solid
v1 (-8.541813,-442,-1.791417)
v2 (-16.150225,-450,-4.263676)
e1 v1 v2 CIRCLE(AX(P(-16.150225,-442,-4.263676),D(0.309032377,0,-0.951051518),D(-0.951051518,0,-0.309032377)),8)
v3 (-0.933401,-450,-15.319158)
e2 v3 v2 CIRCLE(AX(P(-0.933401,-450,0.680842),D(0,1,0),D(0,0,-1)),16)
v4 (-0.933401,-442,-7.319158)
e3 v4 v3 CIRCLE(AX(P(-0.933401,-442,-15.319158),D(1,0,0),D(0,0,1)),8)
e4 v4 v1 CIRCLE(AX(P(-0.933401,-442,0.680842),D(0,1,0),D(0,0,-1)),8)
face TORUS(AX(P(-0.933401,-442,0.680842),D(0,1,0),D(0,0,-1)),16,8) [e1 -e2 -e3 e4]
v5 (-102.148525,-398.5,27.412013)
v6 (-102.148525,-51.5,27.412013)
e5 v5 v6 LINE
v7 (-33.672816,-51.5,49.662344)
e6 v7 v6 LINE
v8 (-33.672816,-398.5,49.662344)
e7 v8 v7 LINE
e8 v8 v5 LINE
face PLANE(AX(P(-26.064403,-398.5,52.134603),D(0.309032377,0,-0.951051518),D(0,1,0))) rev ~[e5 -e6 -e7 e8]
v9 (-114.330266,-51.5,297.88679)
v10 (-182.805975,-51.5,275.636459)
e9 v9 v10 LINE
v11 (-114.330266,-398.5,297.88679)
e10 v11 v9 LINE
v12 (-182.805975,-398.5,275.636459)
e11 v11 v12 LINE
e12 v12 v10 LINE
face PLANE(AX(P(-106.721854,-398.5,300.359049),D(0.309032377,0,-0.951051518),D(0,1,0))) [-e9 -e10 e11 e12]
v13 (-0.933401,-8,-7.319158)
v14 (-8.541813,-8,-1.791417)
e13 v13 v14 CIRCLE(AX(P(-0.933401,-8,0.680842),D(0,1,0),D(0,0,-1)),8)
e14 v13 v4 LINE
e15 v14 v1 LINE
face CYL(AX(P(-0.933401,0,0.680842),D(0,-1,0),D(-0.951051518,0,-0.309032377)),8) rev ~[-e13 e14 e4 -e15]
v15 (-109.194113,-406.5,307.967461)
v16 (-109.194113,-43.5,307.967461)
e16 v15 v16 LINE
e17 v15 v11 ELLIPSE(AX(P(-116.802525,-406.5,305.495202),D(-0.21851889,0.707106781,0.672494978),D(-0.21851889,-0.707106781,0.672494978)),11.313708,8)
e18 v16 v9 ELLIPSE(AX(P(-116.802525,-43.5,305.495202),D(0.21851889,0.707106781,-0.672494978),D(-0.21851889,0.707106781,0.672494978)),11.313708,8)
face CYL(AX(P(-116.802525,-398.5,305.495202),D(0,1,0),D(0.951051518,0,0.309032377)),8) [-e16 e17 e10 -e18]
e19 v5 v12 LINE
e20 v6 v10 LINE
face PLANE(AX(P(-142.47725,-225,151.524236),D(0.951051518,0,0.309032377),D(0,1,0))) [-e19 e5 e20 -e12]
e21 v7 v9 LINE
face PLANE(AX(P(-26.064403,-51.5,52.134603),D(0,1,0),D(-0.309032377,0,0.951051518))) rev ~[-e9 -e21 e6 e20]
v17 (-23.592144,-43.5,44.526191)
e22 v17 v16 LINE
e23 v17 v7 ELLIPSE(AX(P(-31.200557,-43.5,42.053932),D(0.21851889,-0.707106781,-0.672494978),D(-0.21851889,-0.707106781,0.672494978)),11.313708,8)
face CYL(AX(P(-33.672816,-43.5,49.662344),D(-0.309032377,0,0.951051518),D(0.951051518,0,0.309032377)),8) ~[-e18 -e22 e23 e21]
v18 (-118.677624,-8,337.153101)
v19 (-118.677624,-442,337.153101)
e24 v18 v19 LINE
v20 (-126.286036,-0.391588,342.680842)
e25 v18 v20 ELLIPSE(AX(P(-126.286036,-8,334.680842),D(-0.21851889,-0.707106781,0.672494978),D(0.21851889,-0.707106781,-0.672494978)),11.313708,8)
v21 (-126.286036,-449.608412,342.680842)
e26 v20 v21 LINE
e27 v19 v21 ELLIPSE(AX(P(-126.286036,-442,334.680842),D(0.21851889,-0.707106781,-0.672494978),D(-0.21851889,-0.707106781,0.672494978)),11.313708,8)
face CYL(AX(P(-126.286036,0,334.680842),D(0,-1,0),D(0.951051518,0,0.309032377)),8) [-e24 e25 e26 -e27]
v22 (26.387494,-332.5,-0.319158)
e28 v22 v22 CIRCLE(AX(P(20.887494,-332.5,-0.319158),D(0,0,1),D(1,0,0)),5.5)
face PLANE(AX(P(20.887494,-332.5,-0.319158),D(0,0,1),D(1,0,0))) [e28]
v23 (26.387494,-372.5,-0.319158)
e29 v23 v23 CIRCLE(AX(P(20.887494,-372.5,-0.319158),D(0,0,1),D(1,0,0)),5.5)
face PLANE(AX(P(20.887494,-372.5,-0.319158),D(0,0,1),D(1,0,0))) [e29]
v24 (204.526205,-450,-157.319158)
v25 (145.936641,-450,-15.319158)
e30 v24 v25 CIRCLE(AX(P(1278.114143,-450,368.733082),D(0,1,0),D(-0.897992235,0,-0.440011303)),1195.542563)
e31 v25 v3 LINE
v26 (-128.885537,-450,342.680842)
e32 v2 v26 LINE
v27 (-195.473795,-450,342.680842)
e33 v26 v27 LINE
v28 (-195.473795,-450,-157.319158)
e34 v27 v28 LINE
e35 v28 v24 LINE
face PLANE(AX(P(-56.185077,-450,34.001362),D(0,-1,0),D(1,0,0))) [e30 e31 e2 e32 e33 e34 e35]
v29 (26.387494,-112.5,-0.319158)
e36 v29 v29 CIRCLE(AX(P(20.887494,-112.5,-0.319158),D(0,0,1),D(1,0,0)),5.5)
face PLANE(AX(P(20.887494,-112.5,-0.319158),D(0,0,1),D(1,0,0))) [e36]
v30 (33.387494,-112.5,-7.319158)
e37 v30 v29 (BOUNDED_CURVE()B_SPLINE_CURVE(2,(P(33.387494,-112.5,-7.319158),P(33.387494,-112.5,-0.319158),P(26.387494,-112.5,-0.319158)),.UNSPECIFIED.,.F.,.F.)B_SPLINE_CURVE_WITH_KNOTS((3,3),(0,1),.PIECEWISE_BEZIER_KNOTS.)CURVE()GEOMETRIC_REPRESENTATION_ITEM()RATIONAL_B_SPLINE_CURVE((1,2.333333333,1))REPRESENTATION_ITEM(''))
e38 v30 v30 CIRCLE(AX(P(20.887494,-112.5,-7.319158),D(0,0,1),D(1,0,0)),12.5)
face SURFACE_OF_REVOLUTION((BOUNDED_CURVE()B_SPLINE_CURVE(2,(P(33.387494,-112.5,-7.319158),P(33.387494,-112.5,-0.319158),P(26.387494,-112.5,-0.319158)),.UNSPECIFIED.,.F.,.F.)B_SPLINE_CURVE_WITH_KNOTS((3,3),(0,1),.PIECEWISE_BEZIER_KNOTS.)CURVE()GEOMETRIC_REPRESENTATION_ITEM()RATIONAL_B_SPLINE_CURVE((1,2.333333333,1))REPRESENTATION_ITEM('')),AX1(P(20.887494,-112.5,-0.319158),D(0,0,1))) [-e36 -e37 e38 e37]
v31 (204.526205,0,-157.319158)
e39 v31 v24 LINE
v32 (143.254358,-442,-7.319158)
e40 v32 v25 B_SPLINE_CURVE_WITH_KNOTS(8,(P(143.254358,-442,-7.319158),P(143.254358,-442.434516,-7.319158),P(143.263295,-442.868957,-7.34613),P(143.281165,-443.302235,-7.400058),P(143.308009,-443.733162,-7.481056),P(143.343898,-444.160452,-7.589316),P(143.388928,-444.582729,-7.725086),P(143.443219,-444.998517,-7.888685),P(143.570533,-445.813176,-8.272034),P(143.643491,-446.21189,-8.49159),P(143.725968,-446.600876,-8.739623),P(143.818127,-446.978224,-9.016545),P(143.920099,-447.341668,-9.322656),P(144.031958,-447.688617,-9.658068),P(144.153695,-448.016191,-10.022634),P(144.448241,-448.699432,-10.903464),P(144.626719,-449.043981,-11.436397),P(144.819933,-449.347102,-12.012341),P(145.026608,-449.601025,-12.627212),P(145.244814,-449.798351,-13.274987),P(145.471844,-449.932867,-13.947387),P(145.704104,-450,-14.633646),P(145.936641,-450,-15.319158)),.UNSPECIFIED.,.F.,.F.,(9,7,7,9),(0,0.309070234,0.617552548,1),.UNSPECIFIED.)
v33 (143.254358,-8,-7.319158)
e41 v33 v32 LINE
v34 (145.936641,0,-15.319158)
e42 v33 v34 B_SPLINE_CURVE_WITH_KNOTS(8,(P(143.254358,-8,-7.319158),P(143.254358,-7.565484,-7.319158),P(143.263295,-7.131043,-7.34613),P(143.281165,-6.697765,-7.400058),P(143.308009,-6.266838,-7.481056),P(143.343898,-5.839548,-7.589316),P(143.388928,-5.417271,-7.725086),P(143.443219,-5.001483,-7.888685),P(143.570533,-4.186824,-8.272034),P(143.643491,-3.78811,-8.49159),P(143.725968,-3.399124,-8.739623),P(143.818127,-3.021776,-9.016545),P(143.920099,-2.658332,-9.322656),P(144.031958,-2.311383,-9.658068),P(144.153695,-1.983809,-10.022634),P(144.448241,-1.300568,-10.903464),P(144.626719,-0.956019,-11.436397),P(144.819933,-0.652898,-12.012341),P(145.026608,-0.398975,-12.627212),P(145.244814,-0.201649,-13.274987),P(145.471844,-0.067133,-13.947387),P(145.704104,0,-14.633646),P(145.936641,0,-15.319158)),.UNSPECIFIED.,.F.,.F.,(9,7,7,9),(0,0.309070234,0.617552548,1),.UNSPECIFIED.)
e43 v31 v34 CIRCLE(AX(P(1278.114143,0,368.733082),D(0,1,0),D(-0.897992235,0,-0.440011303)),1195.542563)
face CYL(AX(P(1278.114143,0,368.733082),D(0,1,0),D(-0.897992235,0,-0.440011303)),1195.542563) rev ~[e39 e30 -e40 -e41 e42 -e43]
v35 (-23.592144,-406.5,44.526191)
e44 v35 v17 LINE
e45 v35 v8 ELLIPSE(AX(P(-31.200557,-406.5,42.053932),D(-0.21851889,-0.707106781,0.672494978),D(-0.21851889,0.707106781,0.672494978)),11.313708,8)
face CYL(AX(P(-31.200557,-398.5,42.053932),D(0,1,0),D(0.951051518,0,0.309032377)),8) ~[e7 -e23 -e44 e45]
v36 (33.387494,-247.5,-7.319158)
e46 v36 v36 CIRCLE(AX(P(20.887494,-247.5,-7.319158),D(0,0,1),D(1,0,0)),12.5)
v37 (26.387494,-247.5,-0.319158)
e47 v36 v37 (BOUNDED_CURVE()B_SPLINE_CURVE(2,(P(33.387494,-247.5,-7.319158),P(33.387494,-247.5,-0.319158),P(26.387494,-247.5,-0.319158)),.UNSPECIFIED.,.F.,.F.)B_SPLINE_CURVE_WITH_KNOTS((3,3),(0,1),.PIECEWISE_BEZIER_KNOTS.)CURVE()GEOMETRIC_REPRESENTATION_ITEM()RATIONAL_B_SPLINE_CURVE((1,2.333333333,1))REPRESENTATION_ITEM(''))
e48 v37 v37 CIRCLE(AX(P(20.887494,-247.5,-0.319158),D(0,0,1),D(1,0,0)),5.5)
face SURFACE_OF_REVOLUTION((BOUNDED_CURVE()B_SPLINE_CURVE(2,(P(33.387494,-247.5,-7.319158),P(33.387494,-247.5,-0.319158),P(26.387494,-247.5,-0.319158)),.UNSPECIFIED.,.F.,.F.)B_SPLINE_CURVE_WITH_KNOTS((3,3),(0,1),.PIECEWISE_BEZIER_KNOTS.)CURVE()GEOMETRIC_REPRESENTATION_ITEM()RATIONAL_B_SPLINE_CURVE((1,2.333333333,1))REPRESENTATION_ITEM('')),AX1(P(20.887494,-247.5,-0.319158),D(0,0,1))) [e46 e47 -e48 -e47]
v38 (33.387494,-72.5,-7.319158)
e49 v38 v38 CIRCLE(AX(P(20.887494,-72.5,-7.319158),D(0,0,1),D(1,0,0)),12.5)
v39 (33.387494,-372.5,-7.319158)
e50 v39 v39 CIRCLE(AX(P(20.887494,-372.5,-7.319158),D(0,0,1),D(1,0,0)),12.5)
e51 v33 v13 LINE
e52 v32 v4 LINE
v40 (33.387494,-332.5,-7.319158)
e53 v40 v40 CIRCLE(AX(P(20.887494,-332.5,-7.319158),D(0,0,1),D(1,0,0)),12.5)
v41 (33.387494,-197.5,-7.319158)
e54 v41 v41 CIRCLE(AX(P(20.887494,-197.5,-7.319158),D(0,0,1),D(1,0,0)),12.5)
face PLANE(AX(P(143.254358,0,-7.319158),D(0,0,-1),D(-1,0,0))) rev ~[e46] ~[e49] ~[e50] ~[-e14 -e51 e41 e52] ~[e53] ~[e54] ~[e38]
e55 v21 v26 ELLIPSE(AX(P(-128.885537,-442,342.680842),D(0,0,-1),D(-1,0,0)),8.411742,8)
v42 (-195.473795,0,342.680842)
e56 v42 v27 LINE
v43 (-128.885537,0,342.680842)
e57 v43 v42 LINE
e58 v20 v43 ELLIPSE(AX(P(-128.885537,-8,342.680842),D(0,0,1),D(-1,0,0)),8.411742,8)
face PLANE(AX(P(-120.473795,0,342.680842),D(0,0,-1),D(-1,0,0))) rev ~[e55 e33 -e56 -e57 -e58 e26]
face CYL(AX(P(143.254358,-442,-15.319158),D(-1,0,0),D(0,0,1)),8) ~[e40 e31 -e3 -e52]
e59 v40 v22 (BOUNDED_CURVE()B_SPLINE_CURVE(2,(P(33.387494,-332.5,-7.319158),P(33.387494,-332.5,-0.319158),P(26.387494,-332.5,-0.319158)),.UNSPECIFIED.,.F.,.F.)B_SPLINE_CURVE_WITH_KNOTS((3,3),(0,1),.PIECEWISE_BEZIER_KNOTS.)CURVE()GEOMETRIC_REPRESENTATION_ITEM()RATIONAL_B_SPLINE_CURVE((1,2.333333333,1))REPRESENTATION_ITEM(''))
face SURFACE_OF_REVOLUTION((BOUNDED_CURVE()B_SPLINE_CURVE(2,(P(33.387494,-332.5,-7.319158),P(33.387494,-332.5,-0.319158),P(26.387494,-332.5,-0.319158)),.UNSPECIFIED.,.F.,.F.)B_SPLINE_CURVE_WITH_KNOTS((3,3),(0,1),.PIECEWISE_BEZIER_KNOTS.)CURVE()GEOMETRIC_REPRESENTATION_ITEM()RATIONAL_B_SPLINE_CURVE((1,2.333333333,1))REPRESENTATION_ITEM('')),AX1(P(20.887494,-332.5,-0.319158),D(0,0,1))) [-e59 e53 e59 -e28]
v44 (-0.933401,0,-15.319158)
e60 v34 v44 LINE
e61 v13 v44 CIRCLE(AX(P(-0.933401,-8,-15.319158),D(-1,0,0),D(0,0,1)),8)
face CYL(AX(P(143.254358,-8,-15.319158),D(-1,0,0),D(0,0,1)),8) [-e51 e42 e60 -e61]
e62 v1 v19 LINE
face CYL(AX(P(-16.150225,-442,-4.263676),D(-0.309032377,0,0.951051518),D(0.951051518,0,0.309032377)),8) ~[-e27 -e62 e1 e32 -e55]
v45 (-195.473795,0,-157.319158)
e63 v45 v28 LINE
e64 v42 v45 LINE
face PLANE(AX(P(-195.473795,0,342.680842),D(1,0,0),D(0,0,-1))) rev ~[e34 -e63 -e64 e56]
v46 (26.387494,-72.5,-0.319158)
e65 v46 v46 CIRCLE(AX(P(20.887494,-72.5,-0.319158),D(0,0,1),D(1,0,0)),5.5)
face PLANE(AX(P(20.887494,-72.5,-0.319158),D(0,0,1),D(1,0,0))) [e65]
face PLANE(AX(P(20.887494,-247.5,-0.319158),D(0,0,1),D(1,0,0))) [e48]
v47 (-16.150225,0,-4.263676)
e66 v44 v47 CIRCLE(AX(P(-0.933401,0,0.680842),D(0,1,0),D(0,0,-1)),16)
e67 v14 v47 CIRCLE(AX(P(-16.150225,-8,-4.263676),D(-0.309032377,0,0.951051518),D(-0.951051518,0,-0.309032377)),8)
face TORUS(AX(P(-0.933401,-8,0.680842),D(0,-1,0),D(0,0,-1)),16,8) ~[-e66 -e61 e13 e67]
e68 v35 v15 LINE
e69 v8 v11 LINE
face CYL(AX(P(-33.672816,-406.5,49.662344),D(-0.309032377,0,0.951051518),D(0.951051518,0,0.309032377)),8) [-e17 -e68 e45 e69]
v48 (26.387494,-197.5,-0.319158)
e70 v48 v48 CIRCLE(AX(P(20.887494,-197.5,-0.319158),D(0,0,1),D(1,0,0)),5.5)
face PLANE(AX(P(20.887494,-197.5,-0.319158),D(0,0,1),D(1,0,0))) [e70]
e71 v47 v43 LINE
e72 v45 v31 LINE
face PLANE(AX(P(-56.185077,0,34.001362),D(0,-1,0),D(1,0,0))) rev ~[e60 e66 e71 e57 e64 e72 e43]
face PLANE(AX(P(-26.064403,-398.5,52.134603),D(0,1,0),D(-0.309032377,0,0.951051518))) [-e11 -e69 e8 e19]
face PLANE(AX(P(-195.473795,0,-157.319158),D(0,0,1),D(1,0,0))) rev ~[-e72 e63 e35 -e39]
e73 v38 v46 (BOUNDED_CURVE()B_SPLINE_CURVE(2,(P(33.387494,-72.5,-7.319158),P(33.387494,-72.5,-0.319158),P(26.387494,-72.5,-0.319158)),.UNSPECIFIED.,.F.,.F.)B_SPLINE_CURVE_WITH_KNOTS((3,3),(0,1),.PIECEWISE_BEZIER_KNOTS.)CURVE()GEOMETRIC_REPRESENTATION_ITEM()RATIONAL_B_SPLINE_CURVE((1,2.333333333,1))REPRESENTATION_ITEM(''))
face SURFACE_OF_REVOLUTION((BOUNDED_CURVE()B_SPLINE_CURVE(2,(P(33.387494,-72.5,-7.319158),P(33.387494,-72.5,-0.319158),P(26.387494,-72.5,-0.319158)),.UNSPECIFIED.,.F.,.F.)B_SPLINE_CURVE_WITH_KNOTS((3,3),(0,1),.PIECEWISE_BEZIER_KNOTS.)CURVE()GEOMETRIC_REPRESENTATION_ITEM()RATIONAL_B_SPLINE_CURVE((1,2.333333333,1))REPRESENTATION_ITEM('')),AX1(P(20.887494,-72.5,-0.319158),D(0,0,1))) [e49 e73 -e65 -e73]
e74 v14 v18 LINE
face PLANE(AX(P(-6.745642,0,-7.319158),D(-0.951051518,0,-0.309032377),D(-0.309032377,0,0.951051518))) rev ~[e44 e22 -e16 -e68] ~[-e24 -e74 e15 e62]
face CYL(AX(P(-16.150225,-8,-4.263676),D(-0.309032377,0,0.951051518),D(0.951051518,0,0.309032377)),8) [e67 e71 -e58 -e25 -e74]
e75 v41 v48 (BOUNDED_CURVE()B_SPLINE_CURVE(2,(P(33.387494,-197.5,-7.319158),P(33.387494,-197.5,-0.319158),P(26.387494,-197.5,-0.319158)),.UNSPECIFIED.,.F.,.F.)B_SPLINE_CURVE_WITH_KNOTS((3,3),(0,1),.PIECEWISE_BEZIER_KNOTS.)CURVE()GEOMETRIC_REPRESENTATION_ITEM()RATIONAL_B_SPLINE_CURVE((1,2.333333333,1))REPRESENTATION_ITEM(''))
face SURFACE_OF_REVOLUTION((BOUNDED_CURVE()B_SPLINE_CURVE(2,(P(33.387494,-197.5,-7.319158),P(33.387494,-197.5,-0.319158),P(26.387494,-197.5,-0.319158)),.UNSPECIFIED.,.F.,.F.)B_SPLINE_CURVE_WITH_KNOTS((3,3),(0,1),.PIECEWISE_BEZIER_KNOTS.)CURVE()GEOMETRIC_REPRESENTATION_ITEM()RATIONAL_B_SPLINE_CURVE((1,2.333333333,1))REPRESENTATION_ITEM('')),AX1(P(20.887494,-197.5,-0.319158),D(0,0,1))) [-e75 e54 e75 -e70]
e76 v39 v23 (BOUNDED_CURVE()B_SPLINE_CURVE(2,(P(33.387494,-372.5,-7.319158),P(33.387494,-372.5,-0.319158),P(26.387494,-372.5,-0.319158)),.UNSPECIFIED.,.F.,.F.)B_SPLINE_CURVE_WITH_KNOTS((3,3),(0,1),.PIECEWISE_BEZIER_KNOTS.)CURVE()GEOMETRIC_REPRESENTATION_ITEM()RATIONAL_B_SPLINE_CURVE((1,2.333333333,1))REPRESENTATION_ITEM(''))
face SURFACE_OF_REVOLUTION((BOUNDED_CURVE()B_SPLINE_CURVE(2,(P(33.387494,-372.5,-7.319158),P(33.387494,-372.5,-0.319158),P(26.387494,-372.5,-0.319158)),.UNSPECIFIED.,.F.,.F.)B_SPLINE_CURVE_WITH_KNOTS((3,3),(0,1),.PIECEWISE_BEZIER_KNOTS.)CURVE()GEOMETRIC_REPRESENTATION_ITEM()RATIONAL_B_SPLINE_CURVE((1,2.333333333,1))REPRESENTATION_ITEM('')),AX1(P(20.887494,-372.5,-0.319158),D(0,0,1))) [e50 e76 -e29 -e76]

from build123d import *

# Parameters (mm, degrees)
F1_DEPTH = 450
F2_W     = 347
F2_H     = 261
F3_DEPTH = 80
F4_F1_R  = 8
F4_F2_R  = 8
F5_R     = 12.5
F6_DEPTH = 7


# Not quite as in the source:
# - a fillet or chamfer that OpenCascade refuses, or shapes differently, is made with other operations: its cross-section is extruded or revolved along the edge and cut away or added


with BuildPart() as f1:
    # F0 (on Front) → F1 (new body)
    with BuildSketch(Plane.XZ):
        with BuildLine():
            Line((-120.4737946391, 342.6808416843), (-195.4737946391, 342.6808416843))
            Line((-195.4737946391, 342.6808416843), (-195.4737946391, -157.3191583157))
            Line((-195.4737946391, -157.3191583157), (204.5262053609, -157.3191583157))
            ThreePointArc((204.5262053609, -157.3191583157), (171.3461744918, -83.3583725961), (143.2543578127, -7.3191583157))
            Line((143.2543578127, -7.3191583157), (-6.7456421873, -7.3191583157))
            Line((-6.7456421873, -7.3191583157), (-120.4737946391, 342.6808416843))
        make_face()
    extrude(amount=F1_DEPTH)

    # F2 (on face) → F3 (cut)
    with BuildSketch(Plane(origin=(-8.2525689762, 0, -2.681569779), x_dir=(0, 1, 0), z_dir=(0.951051518, 0, 0.3090323772))):
        with Locations((-225, 188.1374378125)):
            Rectangle(F2_W, F2_H)
    extrude(amount=-F3_DEPTH, mode=Mode.SUBTRACT)

    # F4: fillet of radius 8 on 8 edges, made by hand

    # F4_f1
    f4_f1_edges = [f1.edges().sort_by_distance(p)[0] for p in [
        (-6.7456421873, -225, -7.3191583157),
    ]]
    fillet(f4_f1_edges, radius=F4_F1_R)

    # F4_f2
    f4_f2_edges = [f1.edges().sort_by_distance(p)[0] for p in [
        (-64.5078037977, 0, 170.4447121755),
        (-64.5078037977, -450, 170.4447121755),
        (-120.4737946391, -225, 342.6808416843),
        (-66.3931286265, -398.5, 176.2468260396),
        (-106.7218538531, -225, 300.3590491347),
        (-66.3931286265, -51.5, 176.2468260396),
        (-26.0644034, -225, 52.1346029445),
        (-5.6356304889, -450, -5.791332299),
        (-5.6356304889, 0, -5.791332299),
    ]]
    fillet(f4_f2_edges, radius=F4_F2_R)

    # F5 (on face) → F6 (join)
    with BuildSketch(Plane.XY.offset(-7.3191583157)):
        with Locations((20.8874940872, -372.5)):
            Circle(F5_R)
        with Locations((20.8874940872, -332.5)):
            Circle(F5_R)
        with Locations((20.8874940872, -247.5)):
            Circle(F5_R)
        with Locations((20.8874940872, -197.5)):
            Circle(F5_R)
        with Locations((20.8874940872, -112.5)):
            Circle(F5_R)
        with Locations((20.8874940872, -72.5)):
            Circle(F5_R)
    extrude(amount=F6_DEPTH)

    # F7: fillet of radius 7 on 1 edges, made by hand

    # F7_s1 → F7_t2 (revolve, cut)
    with BuildSketch(Plane.XZ.offset(372.5)):
        with BuildLine():
            add(Edge.make_bspline(
                [(33.3874940872, -7.3191583157), (33.3874940872, -0.3191583157), (26.3874940872, -0.3191583157)],
                knots=[0, 0, 0, 1, 1, 1], degree=2, weights=[1, 2.3333333333, 1]))
            Line((26.3874940872, -0.3191583157), (33.3874940872, -0.3191583157))
            Line((33.3874940872, -0.3191583157), (33.3874940872, -7.3191583157))
        make_face()
    revolve(axis=Axis((20.8874940872, -372.5, -0.3191583157), (0, 0, 1)), mode=Mode.SUBTRACT)

    # F8: fillet of radius 7 on 5 edges, made by hand

    # F8_s1 → F8_t2 (revolve, cut)
    with BuildSketch(Plane.XZ.offset(332.5)):
        with BuildLine():
            add(Edge.make_bspline(
                [(33.3874940872, -7.3191583157), (33.3874940872, -0.3191583157), (26.3874940872, -0.3191583157)],
                knots=[0, 0, 0, 1, 1, 1], degree=2, weights=[1, 2.3333333333, 1]))
            Line((26.3874940872, -0.3191583157), (33.3874940872, -0.3191583157))
            Line((33.3874940872, -0.3191583157), (33.3874940872, -7.3191583157))
        make_face()
    revolve(axis=Axis((20.8874940872, -332.5, -0.3191583157), (0, 0, 1)), mode=Mode.SUBTRACT)

    # F8_s3 → F8_t4 (revolve, cut)
    with BuildSketch(Plane.XZ.offset(197.5)):
        with BuildLine():
            add(Edge.make_bspline(
                [(33.3874940872, -7.3191583157), (33.3874940872, -0.3191583157), (26.3874940872, -0.3191583157)],
                knots=[0, 0, 0, 1, 1, 1], degree=2, weights=[1, 2.3333333333, 1]))
            Line((26.3874940872, -0.3191583157), (33.3874940872, -0.3191583157))
            Line((33.3874940872, -0.3191583157), (33.3874940872, -7.3191583157))
        make_face()
    revolve(axis=Axis((20.8874940872, -197.5, -0.3191583157), (0, 0, 1)), mode=Mode.SUBTRACT)

    # F8_s5 → F8_t6 (revolve, cut)
    with BuildSketch(Plane.XZ.offset(247.5)):
        with BuildLine():
            add(Edge.make_bspline(
                [(33.3874940872, -7.3191583157), (33.3874940872, -0.3191583157), (26.3874940872, -0.3191583157)],
                knots=[0, 0, 0, 1, 1, 1], degree=2, weights=[1, 2.3333333333, 1]))
            Line((26.3874940872, -0.3191583157), (33.3874940872, -0.3191583157))
            Line((33.3874940872, -0.3191583157), (33.3874940872, -7.3191583157))
        make_face()
    revolve(axis=Axis((20.8874940872, -247.5, -0.3191583157), (0, 0, 1)), mode=Mode.SUBTRACT)

    # F8_s7 → F8_t8 (revolve, cut)
    with BuildSketch(Plane.XZ.offset(112.5)):
        with BuildLine():
            add(Edge.make_bspline(
                [(33.3874940872, -7.3191583157), (33.3874940872, -0.3191583157), (26.3874940872, -0.3191583157)],
                knots=[0, 0, 0, 1, 1, 1], degree=2, weights=[1, 2.3333333333, 1]))
            Line((26.3874940872, -0.3191583157), (33.3874940872, -0.3191583157))
            Line((33.3874940872, -0.3191583157), (33.3874940872, -7.3191583157))
        make_face()
    revolve(axis=Axis((20.8874940872, -112.5, -0.3191583157), (0, 0, 1)), mode=Mode.SUBTRACT)

    # F8_s9 → F8_t10 (revolve, cut)
    with BuildSketch(Plane.XZ.offset(72.5)):
        with BuildLine():
            add(Edge.make_bspline(
                [(33.3874940872, -7.3191583157), (33.3874940872, -0.3191583157), (26.3874940872, -0.3191583157)],
                knots=[0, 0, 0, 1, 1, 1], degree=2, weights=[1, 2.3333333333, 1]))
            Line((26.3874940872, -0.3191583157), (33.3874940872, -0.3191583157))
            Line((33.3874940872, -0.3191583157), (33.3874940872, -7.3191583157))
        make_face()
    revolve(axis=Axis((20.8874940872, -72.5, -0.3191583157), (0, 0, 1)), mode=Mode.SUBTRACT)


solid = f1.part
